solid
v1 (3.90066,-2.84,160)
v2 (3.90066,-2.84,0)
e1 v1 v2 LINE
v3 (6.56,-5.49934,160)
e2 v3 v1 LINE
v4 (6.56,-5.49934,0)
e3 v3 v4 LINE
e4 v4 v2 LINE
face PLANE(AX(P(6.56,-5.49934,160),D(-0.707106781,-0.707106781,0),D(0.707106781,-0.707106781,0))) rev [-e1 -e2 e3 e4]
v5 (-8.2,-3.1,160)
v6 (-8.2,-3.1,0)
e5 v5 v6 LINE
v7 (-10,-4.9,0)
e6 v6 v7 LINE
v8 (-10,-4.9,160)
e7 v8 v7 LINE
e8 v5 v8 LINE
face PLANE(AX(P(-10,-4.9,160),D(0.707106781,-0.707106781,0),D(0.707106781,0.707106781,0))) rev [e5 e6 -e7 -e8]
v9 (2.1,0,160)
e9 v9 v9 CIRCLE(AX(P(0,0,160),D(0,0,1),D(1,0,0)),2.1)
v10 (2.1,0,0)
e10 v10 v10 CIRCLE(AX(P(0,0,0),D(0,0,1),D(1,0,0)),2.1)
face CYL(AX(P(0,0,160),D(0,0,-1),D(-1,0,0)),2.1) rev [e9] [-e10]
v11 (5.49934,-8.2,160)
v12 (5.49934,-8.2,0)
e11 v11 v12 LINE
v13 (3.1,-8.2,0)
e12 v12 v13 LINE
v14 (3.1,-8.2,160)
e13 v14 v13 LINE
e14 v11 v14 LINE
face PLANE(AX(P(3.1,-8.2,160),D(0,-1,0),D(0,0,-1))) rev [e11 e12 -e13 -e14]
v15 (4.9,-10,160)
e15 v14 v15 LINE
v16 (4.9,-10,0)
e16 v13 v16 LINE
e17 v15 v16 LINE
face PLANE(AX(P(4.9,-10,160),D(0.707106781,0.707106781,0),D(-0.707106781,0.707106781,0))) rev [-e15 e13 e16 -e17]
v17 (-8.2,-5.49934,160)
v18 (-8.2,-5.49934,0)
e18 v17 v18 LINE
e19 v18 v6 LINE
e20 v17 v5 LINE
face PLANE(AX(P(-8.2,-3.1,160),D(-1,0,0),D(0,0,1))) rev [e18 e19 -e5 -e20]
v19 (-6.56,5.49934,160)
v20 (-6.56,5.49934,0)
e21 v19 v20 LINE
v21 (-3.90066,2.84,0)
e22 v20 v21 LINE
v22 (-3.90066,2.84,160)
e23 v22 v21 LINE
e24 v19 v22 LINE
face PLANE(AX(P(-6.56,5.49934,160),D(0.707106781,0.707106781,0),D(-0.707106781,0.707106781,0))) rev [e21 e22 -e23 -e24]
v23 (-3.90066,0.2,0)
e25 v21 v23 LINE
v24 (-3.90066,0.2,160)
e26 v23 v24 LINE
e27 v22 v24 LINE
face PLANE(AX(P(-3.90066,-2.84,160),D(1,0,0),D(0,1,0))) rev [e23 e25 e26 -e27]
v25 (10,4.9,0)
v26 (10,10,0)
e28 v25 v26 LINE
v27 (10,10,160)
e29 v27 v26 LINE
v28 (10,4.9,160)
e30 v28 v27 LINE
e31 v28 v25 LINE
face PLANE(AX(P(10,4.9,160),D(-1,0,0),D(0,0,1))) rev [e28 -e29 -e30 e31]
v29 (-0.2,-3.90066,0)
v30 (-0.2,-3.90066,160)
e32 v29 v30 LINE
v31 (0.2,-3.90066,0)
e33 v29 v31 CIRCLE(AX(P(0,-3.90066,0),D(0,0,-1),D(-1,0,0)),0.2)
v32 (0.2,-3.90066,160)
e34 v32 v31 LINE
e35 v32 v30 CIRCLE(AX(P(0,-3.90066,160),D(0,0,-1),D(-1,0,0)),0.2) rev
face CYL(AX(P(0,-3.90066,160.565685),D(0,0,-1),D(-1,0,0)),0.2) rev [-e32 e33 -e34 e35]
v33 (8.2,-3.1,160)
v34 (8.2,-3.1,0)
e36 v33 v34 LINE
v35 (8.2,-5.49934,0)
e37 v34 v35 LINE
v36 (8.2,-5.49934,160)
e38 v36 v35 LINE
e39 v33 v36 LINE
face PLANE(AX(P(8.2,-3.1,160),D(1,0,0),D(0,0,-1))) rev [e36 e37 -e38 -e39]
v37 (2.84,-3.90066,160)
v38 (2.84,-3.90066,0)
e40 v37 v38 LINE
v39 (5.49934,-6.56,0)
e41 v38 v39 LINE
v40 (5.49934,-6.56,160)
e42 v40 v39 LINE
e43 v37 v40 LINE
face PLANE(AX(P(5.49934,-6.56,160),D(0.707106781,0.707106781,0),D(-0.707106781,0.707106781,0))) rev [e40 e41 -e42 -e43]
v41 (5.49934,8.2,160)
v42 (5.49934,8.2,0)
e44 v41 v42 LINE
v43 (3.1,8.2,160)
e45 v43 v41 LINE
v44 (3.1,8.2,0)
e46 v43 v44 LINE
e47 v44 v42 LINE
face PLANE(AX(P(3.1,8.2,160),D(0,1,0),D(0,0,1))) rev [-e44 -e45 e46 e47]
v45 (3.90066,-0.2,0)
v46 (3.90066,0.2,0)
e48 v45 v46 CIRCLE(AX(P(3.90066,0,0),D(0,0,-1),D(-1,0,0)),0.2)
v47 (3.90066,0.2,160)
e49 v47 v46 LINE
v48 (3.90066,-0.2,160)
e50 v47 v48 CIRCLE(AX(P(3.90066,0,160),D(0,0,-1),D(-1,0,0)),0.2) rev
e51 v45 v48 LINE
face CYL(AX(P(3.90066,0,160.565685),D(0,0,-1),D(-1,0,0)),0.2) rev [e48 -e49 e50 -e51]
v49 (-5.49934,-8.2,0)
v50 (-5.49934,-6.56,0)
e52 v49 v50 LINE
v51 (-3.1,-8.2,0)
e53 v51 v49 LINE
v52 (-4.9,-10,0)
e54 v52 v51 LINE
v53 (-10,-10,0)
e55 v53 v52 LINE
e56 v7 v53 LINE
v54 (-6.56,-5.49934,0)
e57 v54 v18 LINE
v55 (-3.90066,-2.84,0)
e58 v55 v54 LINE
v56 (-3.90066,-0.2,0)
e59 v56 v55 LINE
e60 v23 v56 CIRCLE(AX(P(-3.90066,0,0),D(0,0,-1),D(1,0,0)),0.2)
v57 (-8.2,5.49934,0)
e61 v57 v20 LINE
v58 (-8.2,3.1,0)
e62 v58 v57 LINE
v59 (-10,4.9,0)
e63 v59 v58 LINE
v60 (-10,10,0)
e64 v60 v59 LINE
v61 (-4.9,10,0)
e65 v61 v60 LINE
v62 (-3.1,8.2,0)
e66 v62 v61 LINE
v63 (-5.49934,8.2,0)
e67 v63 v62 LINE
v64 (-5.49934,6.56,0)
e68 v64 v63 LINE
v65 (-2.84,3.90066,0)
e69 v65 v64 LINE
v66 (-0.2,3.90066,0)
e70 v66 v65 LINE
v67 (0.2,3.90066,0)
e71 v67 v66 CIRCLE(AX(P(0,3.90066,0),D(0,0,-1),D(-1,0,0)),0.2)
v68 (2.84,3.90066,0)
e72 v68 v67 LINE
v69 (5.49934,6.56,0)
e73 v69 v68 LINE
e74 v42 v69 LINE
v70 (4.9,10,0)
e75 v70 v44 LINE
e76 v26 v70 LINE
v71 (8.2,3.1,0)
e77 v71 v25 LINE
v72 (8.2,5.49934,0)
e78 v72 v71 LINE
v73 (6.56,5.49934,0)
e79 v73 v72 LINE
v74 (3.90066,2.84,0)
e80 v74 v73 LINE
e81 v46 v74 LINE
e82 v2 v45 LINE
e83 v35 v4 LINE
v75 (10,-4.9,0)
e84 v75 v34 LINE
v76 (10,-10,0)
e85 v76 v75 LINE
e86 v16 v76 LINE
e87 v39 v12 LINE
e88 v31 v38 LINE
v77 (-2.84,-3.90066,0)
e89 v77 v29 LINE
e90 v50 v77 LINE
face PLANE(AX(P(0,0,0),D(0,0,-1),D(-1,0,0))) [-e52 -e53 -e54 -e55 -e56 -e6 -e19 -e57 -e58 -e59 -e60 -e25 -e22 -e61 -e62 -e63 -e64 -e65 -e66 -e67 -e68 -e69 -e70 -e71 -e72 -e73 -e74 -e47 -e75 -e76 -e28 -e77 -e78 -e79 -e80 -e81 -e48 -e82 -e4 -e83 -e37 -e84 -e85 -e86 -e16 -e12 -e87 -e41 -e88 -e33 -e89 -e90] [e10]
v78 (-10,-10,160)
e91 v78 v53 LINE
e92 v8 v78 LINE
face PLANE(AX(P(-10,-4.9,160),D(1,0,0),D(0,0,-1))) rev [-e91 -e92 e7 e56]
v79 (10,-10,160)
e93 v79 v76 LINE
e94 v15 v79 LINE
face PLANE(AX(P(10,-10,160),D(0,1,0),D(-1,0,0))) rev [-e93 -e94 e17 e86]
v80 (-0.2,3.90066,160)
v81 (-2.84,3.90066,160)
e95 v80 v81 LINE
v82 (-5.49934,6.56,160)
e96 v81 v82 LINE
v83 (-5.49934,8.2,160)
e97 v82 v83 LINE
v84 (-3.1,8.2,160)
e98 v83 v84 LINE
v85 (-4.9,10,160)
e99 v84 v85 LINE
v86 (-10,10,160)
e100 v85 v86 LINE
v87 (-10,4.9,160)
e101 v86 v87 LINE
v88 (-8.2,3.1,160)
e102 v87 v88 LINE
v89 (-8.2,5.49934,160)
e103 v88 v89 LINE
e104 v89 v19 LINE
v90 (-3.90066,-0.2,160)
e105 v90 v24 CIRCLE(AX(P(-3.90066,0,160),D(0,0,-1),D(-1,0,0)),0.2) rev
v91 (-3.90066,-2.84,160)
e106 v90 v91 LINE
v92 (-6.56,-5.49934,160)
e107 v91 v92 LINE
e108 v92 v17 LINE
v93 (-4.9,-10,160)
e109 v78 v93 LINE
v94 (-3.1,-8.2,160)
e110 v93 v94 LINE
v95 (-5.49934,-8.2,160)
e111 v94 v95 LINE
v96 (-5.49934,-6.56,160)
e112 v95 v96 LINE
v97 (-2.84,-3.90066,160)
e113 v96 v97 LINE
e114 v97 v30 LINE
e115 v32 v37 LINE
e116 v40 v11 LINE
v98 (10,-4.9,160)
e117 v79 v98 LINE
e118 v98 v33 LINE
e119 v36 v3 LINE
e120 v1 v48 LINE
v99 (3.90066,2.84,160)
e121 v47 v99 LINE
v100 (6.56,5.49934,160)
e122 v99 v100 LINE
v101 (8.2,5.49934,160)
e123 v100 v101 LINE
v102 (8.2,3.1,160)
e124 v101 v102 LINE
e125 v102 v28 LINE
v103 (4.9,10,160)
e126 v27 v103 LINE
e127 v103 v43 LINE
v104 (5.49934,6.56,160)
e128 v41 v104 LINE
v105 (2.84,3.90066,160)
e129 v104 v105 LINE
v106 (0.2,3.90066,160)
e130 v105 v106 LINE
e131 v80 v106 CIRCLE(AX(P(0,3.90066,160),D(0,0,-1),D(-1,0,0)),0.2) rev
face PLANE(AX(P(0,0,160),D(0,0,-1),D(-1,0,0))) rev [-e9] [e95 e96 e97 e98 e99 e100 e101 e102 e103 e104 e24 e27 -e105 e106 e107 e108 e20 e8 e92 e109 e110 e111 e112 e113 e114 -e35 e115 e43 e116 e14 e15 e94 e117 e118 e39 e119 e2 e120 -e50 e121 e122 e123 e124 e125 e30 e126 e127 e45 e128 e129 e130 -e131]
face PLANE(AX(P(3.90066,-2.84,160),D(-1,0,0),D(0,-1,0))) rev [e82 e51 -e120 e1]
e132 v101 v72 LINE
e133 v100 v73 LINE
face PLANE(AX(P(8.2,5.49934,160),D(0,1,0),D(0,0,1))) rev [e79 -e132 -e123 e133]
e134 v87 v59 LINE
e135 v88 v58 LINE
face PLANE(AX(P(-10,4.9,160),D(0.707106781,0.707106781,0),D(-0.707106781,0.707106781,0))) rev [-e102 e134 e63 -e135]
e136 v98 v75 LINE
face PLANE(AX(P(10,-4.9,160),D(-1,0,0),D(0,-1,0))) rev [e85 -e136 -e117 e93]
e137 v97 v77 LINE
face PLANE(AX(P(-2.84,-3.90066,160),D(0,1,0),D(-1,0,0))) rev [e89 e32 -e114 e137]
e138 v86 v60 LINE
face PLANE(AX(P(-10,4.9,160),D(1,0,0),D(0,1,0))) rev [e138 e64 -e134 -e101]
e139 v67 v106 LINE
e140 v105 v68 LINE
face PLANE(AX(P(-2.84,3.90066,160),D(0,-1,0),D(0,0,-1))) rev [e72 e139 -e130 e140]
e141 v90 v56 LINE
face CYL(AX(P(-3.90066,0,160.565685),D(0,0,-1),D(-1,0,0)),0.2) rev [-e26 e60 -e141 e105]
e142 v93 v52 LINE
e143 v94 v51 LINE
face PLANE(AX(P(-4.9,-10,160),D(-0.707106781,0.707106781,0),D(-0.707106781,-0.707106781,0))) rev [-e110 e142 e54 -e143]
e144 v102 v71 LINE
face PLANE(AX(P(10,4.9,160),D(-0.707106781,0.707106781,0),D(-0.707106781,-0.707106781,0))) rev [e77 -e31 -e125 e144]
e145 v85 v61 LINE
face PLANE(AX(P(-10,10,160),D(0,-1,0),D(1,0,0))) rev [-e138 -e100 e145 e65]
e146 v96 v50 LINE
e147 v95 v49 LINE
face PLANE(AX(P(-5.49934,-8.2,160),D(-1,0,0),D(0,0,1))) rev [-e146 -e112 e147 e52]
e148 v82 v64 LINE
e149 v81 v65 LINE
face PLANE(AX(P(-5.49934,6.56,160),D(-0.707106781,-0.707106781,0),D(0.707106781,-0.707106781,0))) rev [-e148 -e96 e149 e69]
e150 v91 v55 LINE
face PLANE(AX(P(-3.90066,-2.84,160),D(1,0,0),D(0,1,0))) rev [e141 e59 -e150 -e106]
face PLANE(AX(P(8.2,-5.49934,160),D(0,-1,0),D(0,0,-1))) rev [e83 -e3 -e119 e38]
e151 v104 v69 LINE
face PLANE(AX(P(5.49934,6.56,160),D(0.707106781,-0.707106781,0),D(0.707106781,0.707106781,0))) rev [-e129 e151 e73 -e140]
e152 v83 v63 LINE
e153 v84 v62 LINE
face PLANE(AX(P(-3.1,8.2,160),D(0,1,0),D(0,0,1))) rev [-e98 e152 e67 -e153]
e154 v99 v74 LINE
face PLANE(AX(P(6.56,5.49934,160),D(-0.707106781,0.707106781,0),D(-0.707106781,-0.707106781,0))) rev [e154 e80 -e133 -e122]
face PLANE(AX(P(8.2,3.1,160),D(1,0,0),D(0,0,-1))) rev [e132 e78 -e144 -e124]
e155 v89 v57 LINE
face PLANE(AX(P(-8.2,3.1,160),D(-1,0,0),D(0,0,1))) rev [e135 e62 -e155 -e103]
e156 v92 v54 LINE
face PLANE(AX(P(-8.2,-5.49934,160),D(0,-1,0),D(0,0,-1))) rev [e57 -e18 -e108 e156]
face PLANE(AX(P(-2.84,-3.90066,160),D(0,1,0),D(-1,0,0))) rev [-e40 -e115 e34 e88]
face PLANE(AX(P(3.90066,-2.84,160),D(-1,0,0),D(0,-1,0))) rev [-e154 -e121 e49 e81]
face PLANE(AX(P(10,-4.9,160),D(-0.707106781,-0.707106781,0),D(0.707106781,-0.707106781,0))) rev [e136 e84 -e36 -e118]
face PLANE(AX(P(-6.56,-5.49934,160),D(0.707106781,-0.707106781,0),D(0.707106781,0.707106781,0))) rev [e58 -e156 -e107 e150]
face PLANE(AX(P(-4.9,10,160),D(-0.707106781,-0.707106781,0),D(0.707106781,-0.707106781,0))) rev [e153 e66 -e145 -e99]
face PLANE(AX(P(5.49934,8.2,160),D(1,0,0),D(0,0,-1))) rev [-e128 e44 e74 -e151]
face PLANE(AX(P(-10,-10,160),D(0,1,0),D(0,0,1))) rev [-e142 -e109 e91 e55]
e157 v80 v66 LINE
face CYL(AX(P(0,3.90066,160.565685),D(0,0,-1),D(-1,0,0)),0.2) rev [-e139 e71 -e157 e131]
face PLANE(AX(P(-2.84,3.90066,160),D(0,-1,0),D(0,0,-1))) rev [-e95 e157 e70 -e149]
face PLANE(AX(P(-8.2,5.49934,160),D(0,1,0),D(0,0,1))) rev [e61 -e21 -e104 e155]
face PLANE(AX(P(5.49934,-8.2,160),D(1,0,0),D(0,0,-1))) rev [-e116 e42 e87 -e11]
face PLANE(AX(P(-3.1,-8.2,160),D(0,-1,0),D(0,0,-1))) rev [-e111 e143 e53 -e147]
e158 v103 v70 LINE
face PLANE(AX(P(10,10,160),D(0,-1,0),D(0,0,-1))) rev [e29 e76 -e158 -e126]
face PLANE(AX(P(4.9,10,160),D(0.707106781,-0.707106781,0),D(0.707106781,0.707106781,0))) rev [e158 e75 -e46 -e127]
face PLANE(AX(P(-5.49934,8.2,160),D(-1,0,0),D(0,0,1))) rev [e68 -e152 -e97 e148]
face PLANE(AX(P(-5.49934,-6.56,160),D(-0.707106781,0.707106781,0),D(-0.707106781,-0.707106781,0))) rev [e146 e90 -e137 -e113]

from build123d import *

# Parameters (mm, degrees)
SKETCH1_R           = 2.1
BOSS_EXTRUDE1_DEPTH = 160
CUT_EXTRUDE1_DEPTH  = 160


# Read off the part's stored shape, not the designer's step: Cut-Extrude1
with BuildPart() as part:
    # Sketch1 → Boss-Extrude1 (new body)
    with BuildSketch(Plane.XY):
        Polygon((-10, -4.9), (-10, -10), (-4.9, -10), (-3.1, -8.2), (-5.499339828, -8.2), (-5.499339828, -6.56), (-2.84, -3.900660172), (2.84, -3.900660172), (5.499339828, -6.56), (5.499339828, -8.2), (3.1, -8.2), (4.9, -10), (10, -10), (10, -4.9), (8.2, -3.1), (8.2, -5.499339828), (6.56, -5.499339828), (3.900660172, -2.84), (3.900660172, 2.84), (6.56, 5.499339828), (8.2, 5.499339828), (8.2, 3.1), (10, 4.9), (10, 10), (4.9, 10), (3.1, 8.2), (5.499339828, 8.2), (5.499339828, 6.56), (2.84, 3.900660172), (-2.84, 3.900660172), (-5.499339828, 6.56), (-5.499339828, 8.2), (-3.1, 8.2), (-4.9, 10), (-10, 10), (-10, 4.9), (-8.2, 3.1), (-8.2, 5.499339828), (-6.56, 5.499339828), (-3.900660172, 2.84), (-3.900660172, -2.84), (-6.56, -5.499339828), (-8.2, -5.499339828), (-8.2, -3.1), align=None)
        Circle(SKETCH1_R, mode=Mode.SUBTRACT)
    extrude(amount=BOSS_EXTRUDE1_DEPTH)

    # Cut-Extrude1 outline → Cut-Extrude1 (cut)
    with BuildSketch(Plane.XY):
        with BuildLine():
            ThreePointArc((-3.900660172, -0.2), (-3.700660172, 0), (-3.900660172, 0.2))
            Line((-3.900660172, 0.2), (-3.900660172, -0.2))
        make_face()
        with BuildLine():
            ThreePointArc((-0.2, 3.900660172), (0, 3.700660172), (0.2, 3.900660172))
            Line((0.2, 3.900660172), (-0.2, 3.900660172))
        make_face()
        with BuildLine():
            ThreePointArc((3.900660172, 0.2), (3.700660172, 0), (3.900660172, -0.2))
            Line((3.900660172, -0.2), (3.900660172, 0.2))
        make_face()
        with BuildLine():
            ThreePointArc((0.2, -3.900660172), (0, -3.700660172), (-0.2, -3.900660172))
            Line((-0.2, -3.900660172), (0.2, -3.900660172))
        make_face()
    extrude(amount=CUT_EXTRUDE1_DEPTH, mode=Mode.SUBTRACT)


solid = part.part
